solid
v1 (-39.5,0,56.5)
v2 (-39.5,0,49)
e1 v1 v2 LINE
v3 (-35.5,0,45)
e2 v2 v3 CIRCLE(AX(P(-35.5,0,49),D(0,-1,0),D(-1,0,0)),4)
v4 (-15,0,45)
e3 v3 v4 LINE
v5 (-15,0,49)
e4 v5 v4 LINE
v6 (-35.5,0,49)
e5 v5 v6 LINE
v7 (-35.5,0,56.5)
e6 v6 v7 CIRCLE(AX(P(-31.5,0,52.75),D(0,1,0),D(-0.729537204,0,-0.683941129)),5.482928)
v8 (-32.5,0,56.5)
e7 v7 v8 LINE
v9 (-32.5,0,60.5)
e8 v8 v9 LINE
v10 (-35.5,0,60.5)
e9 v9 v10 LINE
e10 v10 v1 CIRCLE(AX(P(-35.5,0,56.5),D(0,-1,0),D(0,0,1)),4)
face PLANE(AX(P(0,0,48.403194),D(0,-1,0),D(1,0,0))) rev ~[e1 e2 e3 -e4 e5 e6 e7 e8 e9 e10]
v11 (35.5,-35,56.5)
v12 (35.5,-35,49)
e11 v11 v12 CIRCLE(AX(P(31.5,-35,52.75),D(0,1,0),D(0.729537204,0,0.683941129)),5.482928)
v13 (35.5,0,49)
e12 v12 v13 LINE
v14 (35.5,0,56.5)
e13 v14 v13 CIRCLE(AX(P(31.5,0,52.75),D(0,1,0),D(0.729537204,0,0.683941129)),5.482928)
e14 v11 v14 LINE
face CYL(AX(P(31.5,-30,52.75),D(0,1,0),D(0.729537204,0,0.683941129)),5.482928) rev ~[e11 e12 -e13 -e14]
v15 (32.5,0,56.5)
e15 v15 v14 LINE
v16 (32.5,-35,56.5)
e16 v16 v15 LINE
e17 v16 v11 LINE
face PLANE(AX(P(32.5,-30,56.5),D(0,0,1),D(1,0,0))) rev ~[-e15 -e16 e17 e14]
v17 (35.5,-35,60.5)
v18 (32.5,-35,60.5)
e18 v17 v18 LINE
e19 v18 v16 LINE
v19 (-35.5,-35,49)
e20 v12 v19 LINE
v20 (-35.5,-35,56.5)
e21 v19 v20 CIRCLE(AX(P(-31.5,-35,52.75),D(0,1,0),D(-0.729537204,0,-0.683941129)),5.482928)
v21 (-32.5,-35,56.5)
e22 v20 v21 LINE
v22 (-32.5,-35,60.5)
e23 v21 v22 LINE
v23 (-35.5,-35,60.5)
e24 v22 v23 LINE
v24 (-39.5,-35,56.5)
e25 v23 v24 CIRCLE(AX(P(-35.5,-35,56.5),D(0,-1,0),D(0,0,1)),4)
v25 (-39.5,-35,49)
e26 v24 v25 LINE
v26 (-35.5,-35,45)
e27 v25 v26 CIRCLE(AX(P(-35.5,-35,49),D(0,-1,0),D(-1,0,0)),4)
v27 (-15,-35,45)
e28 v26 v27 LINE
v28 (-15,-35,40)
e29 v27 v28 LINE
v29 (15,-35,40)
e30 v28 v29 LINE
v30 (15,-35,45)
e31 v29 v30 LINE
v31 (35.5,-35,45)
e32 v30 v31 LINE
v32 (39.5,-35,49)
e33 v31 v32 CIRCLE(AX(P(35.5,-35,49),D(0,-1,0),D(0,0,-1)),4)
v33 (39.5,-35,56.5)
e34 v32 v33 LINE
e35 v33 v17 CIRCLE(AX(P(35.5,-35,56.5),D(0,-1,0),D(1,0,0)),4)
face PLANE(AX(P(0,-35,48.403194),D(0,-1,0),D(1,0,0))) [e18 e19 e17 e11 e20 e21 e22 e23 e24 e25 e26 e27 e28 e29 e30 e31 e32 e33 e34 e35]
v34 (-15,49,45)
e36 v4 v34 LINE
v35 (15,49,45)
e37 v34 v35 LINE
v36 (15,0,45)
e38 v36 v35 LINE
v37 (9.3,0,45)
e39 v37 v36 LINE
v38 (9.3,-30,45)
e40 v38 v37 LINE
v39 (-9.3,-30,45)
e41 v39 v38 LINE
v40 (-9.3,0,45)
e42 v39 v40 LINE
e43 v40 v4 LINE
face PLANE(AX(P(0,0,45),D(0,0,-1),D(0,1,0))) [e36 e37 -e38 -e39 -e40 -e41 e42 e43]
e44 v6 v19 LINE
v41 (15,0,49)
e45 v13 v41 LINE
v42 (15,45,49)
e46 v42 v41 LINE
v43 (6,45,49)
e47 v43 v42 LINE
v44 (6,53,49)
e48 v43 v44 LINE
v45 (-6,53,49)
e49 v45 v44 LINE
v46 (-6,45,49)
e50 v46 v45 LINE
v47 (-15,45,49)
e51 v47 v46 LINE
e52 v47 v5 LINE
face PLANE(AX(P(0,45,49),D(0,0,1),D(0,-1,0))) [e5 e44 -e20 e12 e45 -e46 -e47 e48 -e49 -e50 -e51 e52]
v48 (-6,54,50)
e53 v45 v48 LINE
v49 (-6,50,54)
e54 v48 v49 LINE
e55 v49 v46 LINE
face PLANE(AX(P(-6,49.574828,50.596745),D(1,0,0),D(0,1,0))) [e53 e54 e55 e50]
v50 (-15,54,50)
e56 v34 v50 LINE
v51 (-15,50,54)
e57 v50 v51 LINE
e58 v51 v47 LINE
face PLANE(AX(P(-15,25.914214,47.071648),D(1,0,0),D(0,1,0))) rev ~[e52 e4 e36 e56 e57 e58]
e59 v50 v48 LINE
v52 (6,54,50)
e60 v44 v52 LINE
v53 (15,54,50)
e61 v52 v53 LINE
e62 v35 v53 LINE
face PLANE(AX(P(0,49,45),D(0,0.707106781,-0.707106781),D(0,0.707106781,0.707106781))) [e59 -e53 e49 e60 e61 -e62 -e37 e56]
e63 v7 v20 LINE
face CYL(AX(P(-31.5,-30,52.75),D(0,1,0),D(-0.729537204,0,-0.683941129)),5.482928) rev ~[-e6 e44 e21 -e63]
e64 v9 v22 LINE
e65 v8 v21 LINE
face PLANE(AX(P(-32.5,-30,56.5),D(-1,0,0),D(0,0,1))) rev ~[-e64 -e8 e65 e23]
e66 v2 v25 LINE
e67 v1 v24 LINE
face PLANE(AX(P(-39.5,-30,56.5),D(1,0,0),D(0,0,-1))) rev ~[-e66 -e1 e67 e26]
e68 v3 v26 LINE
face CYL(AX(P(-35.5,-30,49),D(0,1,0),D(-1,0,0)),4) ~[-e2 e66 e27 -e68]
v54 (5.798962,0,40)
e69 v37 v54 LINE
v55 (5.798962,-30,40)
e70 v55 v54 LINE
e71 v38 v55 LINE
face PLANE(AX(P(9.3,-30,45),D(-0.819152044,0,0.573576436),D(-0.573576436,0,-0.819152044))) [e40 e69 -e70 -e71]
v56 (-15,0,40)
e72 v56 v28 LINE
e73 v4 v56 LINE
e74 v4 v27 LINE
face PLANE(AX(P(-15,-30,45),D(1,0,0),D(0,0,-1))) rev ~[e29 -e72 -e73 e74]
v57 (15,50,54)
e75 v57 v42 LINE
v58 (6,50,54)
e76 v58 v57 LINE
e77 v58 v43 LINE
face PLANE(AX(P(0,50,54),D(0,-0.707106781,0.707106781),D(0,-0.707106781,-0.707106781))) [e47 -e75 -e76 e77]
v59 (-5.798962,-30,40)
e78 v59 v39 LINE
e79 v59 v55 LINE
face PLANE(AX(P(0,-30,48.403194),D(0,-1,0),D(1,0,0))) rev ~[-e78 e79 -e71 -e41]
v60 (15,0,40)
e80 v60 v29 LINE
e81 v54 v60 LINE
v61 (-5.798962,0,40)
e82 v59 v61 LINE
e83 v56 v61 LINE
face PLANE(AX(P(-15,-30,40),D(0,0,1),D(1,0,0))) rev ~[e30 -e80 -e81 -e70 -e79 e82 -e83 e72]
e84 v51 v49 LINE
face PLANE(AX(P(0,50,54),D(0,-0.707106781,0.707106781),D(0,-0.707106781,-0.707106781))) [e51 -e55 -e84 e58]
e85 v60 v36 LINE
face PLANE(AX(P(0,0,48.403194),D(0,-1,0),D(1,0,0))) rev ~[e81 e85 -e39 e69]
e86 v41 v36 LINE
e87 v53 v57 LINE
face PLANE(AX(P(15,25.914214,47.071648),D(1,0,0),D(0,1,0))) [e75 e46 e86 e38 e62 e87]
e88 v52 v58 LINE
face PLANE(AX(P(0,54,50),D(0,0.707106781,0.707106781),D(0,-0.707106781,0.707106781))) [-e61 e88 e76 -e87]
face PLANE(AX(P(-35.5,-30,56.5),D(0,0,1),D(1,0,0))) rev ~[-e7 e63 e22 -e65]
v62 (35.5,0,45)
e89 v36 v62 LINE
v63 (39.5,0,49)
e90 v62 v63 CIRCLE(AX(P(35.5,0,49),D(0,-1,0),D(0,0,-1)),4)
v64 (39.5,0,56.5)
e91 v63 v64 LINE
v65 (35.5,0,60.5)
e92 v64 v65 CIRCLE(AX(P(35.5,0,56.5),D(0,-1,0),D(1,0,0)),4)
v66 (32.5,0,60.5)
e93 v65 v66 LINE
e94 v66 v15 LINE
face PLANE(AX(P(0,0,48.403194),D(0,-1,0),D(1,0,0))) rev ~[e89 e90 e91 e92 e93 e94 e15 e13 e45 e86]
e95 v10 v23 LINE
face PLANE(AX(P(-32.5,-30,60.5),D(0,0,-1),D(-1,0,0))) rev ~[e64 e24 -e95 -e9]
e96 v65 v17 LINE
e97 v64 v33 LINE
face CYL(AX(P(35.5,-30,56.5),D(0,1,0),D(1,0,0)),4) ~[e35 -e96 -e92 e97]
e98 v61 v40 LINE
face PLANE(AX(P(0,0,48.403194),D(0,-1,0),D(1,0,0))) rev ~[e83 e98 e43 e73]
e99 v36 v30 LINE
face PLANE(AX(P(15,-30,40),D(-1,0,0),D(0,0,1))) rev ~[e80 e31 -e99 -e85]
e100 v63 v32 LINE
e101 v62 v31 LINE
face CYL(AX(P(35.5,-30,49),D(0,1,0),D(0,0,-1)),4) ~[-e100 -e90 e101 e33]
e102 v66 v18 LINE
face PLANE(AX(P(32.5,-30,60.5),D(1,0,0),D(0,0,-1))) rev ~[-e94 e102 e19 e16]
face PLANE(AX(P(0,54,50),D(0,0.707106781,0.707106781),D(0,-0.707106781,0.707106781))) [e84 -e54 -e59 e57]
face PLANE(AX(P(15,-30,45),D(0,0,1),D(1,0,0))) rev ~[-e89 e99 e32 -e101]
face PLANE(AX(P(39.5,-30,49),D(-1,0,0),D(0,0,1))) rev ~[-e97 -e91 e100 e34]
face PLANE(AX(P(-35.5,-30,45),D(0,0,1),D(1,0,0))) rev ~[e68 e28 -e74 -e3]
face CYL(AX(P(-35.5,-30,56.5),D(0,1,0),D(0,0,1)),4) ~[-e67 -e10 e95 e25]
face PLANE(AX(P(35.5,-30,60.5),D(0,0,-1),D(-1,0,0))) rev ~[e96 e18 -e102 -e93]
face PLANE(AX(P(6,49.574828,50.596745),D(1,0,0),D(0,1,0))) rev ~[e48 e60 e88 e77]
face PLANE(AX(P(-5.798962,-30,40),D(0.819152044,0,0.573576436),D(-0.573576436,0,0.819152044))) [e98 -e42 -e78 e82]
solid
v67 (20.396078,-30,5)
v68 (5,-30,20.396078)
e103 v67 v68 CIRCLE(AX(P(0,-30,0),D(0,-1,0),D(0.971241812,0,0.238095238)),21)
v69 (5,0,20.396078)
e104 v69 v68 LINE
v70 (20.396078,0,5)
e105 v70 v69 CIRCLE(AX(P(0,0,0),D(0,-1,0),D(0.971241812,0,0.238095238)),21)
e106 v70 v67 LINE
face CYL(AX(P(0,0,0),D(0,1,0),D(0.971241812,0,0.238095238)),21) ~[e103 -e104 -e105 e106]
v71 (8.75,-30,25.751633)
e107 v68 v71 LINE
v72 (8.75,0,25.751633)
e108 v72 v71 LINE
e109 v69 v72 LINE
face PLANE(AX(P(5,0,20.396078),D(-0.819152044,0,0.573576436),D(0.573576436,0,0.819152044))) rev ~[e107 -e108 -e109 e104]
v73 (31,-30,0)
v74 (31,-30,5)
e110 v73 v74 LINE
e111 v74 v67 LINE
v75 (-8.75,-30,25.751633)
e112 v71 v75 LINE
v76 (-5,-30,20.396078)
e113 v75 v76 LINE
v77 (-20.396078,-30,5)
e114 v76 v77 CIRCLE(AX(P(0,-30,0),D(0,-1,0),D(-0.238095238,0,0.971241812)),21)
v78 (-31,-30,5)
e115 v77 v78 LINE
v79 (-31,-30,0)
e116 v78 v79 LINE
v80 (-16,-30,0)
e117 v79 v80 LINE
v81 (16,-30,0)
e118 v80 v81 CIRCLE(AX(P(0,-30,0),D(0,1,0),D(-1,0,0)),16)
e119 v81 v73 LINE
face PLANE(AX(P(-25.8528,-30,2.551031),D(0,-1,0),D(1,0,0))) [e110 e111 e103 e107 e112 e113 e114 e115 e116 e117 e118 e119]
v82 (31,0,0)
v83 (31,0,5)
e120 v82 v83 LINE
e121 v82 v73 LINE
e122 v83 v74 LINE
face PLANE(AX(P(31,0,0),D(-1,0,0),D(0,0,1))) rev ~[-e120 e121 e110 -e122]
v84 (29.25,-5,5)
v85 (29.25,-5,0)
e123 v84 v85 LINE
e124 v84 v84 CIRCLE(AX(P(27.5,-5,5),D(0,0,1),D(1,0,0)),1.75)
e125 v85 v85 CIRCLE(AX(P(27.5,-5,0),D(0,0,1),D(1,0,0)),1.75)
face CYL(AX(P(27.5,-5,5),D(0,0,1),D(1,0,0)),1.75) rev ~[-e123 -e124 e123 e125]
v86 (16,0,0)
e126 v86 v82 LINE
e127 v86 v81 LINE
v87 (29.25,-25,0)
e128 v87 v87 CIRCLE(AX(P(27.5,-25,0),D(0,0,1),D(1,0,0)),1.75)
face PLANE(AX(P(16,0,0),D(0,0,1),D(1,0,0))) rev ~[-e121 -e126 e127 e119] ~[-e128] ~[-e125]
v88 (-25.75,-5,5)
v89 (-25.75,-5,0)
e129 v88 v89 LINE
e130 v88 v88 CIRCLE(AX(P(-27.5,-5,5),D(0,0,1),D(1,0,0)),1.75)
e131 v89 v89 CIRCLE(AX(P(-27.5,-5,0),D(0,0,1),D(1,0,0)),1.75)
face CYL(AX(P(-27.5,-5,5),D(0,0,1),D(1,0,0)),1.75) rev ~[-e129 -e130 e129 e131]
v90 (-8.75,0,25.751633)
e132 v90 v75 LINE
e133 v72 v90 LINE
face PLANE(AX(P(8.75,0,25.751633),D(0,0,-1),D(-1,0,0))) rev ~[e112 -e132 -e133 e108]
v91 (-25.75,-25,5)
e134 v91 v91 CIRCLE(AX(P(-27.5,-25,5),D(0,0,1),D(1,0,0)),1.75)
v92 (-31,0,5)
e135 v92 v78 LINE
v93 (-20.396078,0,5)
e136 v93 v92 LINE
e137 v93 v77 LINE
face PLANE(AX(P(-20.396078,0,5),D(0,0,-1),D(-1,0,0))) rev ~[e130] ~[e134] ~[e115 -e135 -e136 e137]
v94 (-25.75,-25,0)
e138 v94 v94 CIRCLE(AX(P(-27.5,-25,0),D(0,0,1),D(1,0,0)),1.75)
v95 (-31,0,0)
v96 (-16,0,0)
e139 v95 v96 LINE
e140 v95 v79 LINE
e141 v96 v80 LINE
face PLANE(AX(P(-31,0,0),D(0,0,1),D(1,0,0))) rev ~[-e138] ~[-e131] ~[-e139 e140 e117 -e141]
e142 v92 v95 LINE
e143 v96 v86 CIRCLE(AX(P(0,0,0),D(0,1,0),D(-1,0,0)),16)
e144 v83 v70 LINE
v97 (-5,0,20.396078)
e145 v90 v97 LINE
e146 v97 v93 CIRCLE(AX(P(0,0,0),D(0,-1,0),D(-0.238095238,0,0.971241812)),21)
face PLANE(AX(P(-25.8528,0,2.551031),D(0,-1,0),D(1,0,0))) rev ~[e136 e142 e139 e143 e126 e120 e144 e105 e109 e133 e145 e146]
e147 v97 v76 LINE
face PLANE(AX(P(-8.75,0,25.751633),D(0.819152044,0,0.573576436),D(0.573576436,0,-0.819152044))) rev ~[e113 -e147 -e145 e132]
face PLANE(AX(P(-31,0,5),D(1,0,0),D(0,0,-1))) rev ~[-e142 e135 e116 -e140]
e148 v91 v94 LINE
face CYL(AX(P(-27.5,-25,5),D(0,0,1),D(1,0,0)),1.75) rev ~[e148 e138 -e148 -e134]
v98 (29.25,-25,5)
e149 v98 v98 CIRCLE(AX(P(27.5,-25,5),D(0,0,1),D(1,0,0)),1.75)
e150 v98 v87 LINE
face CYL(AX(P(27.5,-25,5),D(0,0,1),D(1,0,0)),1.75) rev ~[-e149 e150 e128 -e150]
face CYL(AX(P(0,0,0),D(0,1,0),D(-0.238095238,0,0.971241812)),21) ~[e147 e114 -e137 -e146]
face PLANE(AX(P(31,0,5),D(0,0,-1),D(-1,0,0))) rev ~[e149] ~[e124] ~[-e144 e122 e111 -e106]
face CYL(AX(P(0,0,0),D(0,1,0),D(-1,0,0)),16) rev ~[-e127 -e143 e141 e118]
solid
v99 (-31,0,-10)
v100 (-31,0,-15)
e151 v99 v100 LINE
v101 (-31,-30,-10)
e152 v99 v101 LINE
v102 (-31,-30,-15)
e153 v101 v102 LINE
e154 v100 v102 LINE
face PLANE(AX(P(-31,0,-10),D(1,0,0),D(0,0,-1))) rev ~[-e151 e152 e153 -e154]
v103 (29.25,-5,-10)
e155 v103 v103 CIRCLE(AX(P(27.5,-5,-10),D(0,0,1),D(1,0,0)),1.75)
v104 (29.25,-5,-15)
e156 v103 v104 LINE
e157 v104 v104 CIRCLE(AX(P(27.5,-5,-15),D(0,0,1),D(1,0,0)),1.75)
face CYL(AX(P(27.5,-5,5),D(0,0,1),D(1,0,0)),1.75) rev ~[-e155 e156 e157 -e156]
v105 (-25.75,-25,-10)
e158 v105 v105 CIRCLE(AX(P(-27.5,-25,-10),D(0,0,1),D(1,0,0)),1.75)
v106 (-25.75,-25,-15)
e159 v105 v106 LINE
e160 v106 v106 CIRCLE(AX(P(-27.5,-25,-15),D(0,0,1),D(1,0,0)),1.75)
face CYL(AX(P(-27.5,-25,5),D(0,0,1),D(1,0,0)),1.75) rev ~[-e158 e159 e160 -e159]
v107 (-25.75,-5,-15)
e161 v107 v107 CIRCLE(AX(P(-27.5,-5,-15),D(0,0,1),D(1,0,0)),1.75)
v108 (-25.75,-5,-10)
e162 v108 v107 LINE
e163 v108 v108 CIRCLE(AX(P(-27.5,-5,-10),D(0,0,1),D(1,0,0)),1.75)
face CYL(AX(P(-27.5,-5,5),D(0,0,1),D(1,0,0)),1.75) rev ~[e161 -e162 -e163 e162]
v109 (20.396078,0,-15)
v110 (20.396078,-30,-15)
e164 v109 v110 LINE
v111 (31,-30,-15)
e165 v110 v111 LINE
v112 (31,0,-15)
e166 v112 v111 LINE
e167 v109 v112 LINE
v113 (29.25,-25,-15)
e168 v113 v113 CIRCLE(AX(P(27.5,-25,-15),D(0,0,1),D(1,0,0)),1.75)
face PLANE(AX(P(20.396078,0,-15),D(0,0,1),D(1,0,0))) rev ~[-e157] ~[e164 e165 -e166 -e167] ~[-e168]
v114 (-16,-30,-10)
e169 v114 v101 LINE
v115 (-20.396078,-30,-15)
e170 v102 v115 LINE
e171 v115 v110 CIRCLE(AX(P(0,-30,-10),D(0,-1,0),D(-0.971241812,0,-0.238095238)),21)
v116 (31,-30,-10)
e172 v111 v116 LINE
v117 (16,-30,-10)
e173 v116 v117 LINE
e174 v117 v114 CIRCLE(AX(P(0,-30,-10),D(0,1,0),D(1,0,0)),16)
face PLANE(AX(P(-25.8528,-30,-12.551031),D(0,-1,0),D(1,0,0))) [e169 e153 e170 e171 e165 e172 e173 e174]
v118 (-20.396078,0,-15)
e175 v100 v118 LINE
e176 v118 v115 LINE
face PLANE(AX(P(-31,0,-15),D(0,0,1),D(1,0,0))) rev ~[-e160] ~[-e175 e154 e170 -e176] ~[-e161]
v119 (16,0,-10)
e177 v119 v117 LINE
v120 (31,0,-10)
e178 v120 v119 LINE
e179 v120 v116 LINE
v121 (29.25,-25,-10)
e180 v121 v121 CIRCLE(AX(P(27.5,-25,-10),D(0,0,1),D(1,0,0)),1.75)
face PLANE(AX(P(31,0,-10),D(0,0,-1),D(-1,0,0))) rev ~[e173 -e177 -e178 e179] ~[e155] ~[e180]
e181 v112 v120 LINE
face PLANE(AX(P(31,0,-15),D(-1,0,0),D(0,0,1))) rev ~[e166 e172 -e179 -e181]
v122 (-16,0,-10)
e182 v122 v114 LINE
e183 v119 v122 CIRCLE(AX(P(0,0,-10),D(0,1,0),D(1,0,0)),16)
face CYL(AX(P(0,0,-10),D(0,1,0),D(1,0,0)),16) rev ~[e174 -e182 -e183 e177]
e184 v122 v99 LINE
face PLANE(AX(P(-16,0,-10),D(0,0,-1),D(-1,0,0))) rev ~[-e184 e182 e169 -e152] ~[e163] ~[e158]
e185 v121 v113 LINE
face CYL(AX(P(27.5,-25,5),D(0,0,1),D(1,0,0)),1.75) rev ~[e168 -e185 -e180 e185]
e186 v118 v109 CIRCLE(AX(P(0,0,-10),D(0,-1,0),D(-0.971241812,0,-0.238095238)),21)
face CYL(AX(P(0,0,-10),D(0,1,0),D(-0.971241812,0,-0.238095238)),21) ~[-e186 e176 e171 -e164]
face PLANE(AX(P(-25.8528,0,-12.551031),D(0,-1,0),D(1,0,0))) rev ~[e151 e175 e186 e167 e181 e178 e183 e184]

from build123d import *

# Parameters (mm, degrees)
F3_DEPTH      = 30
F4_DEPTH      = 5
F6_DEPTH      = 15
F6_DEPTH_BACK = 15
F7_DEPTH      = 6
F8_DEPTH      = 30
F9_DEPTH      = 30
F10_R         = 1.75
F11_DEPTH     = 50


# Not quite as in the source:
# - a feature names something its author has since deleted; it is built from what else it names


with BuildPart() as f3:
    # F2 (on offset) → F3 (new body)
    with BuildSketch(Plane.XZ.offset(30)):
        with BuildLine():
            Line((35.5, 49), (-35.5, 49))
            ThreePointArc((-35.5, 49), (-36.9829280499, 52.75), (-35.5, 56.5))
            Line((-35.5, 56.5), (-32.5, 56.5))
            Line((-32.5, 56.5), (-32.5, 60.5))
            Line((-32.5, 60.5), (-35.5, 60.5))
            ThreePointArc((-35.5, 60.5), (-38.3284271247, 59.3284271247), (-39.5, 56.5))
            Line((-39.5, 56.5), (-39.5, 49))
            ThreePointArc((-39.5, 49), (-38.3284271247, 46.1715728753), (-35.5, 45))
            Line((-35.5, 45), (-15, 45))
            Line((-15, 45), (-15, 40))
            Line((-15, 40), (-5.798962309, 40))
            Line((-5.798962309, 40), (-9.3, 45))
            Line((-9.3, 45), (9.3, 45))
            Line((9.3, 45), (5.798962309, 40))
            Line((5.798962309, 40), (15, 40))
            Line((15, 40), (15, 45))
            Line((15, 45), (35.5, 45))
            ThreePointArc((35.5, 45), (38.3284271247, 46.1715728753), (39.5, 49))
            Line((39.5, 49), (39.5, 56.5))
            ThreePointArc((39.5, 56.5), (38.3284271247, 59.3284271247), (35.5, 60.5))
            Line((35.5, 60.5), (32.5, 60.5))
            Line((32.5, 60.5), (32.5, 56.5))
            Line((32.5, 56.5), (35.5, 56.5))
            ThreePointArc((35.5, 56.5), (36.9829280499, 52.75), (35.5, 49))
        make_face()
    extrude(amount=-F3_DEPTH)

    # F2 (on offset) → F4 (join)
    with BuildSketch(Plane.XZ.offset(30)):
        with BuildLine():
            Line((35.5, 49), (-35.5, 49))
            ThreePointArc((-35.5, 49), (-36.9829280499, 52.75), (-35.5, 56.5))
            Line((-35.5, 56.5), (-32.5, 56.5))
            Line((-32.5, 56.5), (-32.5, 60.5))
            Line((-32.5, 60.5), (-35.5, 60.5))
            ThreePointArc((-35.5, 60.5), (-38.3284271247, 59.3284271247), (-39.5, 56.5))
            Line((-39.5, 56.5), (-39.5, 49))
            ThreePointArc((-39.5, 49), (-38.3284271247, 46.1715728753), (-35.5, 45))
            Line((-35.5, 45), (-15, 45))
            Line((-15, 45), (-15, 40))
            Line((-15, 40), (-5.798962309, 40))
            Line((-5.798962309, 40), (-9.3, 45))
            Line((-9.3, 45), (9.3, 45))
            Line((9.3, 45), (5.798962309, 40))
            Line((5.798962309, 40), (15, 40))
            Line((15, 40), (15, 45))
            Line((15, 45), (35.5, 45))
            ThreePointArc((35.5, 45), (38.3284271247, 46.1715728753), (39.5, 49))
            Line((39.5, 49), (39.5, 56.5))
            ThreePointArc((39.5, 56.5), (38.3284271247, 59.3284271247), (35.5, 60.5))
            Line((35.5, 60.5), (32.5, 60.5))
            Line((32.5, 60.5), (32.5, 56.5))
            Line((32.5, 56.5), (35.5, 56.5))
            ThreePointArc((35.5, 56.5), (36.9829280499, 52.75), (35.5, 49))
        make_face()
        Polygon((-9.3, 45), (-5.798962309, 40), (5.798962309, 40), (9.3, 45), align=None)
    extrude(amount=F4_DEPTH)

    # F5 (on Right) → F6 (join, two sides)
    with BuildSketch(Plane.YZ) as f6_sk:
        Polygon((45, 49), (0, 49), (0, 45), (49, 45), (53, 49), align=None)
        Polygon((50, 54), (45, 49), (53, 49), (54, 50), align=None)
    extrude(amount=F6_DEPTH)
    extrude(f6_sk.sketch, amount=-F6_DEPTH_BACK)

    # F5 (on Right) → F7 (cut, symmetric)
    with BuildSketch(Plane.YZ):
        Polygon((50, 54), (45, 49), (53, 49), (54, 50), align=None)
    extrude(amount=F7_DEPTH, both=True, mode=Mode.SUBTRACT)


with BuildPart() as f8:
    # F0 (on Front) → F8 (new body)
    with BuildSketch(Plane.XZ):
        with BuildLine():
            Line((-31, 0), (-21, 0))
            ThreePointArc((-21, 0), (-20.8484728355, 2.5181700556), (-20.3960780544, 5))
            Line((-20.3960780544, 5), (-31, 5))
            Line((-31, 5), (-31, 0))
        make_face()
        with BuildLine():
            Line((-21, 0), (-16, 0))
            Line((-16, 0), (-16, 5))
            Line((-16, 5), (-20.3960780544, 5))
            ThreePointArc((-20.3960780544, 5), (-20.8484728355, 2.5181700556), (-21, 0))
        make_face()
        with BuildLine():
            ThreePointArc((-16, 0), (0, 16), (16, 0))
            Line((16, 0), (16, 5))
            Line((16, 5), (20.3960780544, 5))
            ThreePointArc((20.3960780544, 5), (14.8492424049, 14.8492424049), (5, 20.3960780544))
            ThreePointArc((5, 20.3960780544), (0, 21), (-5, 20.3960780544))
            ThreePointArc((-5, 20.3960780544), (-14.8492424049, 14.8492424049), (-20.3960780544, 5))
            Line((-20.3960780544, 5), (-16, 5))
            Line((-16, 5), (-16, 0))
        make_face()
        with BuildLine():
            Line((16, 5), (16, 0))
            Line((16, 0), (21, 0))
            ThreePointArc((21, 0), (20.8484728355, 2.5181700556), (20.3960780544, 5))
            Line((20.3960780544, 5), (16, 5))
        make_face()
        with BuildLine():
            ThreePointArc((20.3960780544, 5), (20.8484728355, 2.5181700556), (21, 0))
            Line((21, 0), (31, 0))
            Line((31, 0), (31, 5))
            Line((31, 5), (20.3960780544, 5))
        make_face()
        with BuildLine():
            ThreePointArc((-5, 20.3960780544), (0, 21), (5, 20.3960780544))
            Line((5, 20.3960780544), (8.75, 25.7516330797))
            Line((8.75, 25.7516330797), (-8.75, 25.7516330797))
            Line((-8.75, 25.7516330797), (-5, 20.3960780544))
        make_face()
    extrude(amount=F8_DEPTH)


with BuildPart() as f9:
    # F0 (on Front) → F9 (new body)
    with BuildSketch(Plane.XZ):
        with BuildLine():
            ThreePointArc((-20.3960780544, -15), (-20.8484728355, -12.5181700556), (-21, -10))
            Line((-21, -10), (-31, -10))
            Line((-31, -10), (-31, -15))
            Line((-31, -15), (-20.3960780544, -15))
        make_face()
        with BuildLine():
            Line((-16, -15), (-16, -10))
            Line((-16, -10), (-21, -10))
            ThreePointArc((-21, -10), (-20.8484728355, -12.5181700556), (-20.3960780544, -15))
            Line((-20.3960780544, -15), (-16, -15))
        make_face()
        with BuildLine():
            ThreePointArc((16, -10), (0, -26), (-16, -10))
            Line((-16, -10), (-16, -15))
            Line((-16, -15), (-20.3960780544, -15))
            ThreePointArc((-20.3960780544, -15), (0, -31), (20.3960780544, -15))
            Line((20.3960780544, -15), (16, -15))
            Line((16, -15), (16, -10))
        make_face()
        with BuildLine():
            Line((21, -10), (16, -10))
            Line((16, -10), (16, -15))
            Line((16, -15), (20.3960780544, -15))
            ThreePointArc((20.3960780544, -15), (20.8484728355, -12.5181700556), (21, -10))
        make_face()
        with BuildLine():
            Line((31, -10), (21, -10))
            ThreePointArc((21, -10), (20.8484728355, -12.5181700556), (20.3960780544, -15))
            Line((20.3960780544, -15), (31, -15))
            Line((31, -15), (31, -10))
        make_face()
    extrude(amount=F9_DEPTH)


with BuildPart() as f11_tool:
    # F10 (on face) → F11 (new body)
    with BuildSketch(Plane.XY.offset(5)):
        with Locations((-27.5, -25)):
            Circle(F10_R)
        with Locations((-27.5, -5)):
            Circle(F10_R)
        with Locations((27.5, -5)):
            Circle(F10_R)
        with Locations((27.5, -25)):
            Circle(F10_R)
    extrude(amount=-F11_DEPTH)


with BuildPart() as f8_1:
    add(f8.part)

    # F11: cut by f11_tool
    add(f11_tool.part, mode=Mode.SUBTRACT)


with BuildPart() as f9_1:
    add(f9.part)

    # F11: cut by f11_tool
    add(f11_tool.part, mode=Mode.SUBTRACT)


solid = Compound([f3.part, f8_1.part, f9_1.part])
